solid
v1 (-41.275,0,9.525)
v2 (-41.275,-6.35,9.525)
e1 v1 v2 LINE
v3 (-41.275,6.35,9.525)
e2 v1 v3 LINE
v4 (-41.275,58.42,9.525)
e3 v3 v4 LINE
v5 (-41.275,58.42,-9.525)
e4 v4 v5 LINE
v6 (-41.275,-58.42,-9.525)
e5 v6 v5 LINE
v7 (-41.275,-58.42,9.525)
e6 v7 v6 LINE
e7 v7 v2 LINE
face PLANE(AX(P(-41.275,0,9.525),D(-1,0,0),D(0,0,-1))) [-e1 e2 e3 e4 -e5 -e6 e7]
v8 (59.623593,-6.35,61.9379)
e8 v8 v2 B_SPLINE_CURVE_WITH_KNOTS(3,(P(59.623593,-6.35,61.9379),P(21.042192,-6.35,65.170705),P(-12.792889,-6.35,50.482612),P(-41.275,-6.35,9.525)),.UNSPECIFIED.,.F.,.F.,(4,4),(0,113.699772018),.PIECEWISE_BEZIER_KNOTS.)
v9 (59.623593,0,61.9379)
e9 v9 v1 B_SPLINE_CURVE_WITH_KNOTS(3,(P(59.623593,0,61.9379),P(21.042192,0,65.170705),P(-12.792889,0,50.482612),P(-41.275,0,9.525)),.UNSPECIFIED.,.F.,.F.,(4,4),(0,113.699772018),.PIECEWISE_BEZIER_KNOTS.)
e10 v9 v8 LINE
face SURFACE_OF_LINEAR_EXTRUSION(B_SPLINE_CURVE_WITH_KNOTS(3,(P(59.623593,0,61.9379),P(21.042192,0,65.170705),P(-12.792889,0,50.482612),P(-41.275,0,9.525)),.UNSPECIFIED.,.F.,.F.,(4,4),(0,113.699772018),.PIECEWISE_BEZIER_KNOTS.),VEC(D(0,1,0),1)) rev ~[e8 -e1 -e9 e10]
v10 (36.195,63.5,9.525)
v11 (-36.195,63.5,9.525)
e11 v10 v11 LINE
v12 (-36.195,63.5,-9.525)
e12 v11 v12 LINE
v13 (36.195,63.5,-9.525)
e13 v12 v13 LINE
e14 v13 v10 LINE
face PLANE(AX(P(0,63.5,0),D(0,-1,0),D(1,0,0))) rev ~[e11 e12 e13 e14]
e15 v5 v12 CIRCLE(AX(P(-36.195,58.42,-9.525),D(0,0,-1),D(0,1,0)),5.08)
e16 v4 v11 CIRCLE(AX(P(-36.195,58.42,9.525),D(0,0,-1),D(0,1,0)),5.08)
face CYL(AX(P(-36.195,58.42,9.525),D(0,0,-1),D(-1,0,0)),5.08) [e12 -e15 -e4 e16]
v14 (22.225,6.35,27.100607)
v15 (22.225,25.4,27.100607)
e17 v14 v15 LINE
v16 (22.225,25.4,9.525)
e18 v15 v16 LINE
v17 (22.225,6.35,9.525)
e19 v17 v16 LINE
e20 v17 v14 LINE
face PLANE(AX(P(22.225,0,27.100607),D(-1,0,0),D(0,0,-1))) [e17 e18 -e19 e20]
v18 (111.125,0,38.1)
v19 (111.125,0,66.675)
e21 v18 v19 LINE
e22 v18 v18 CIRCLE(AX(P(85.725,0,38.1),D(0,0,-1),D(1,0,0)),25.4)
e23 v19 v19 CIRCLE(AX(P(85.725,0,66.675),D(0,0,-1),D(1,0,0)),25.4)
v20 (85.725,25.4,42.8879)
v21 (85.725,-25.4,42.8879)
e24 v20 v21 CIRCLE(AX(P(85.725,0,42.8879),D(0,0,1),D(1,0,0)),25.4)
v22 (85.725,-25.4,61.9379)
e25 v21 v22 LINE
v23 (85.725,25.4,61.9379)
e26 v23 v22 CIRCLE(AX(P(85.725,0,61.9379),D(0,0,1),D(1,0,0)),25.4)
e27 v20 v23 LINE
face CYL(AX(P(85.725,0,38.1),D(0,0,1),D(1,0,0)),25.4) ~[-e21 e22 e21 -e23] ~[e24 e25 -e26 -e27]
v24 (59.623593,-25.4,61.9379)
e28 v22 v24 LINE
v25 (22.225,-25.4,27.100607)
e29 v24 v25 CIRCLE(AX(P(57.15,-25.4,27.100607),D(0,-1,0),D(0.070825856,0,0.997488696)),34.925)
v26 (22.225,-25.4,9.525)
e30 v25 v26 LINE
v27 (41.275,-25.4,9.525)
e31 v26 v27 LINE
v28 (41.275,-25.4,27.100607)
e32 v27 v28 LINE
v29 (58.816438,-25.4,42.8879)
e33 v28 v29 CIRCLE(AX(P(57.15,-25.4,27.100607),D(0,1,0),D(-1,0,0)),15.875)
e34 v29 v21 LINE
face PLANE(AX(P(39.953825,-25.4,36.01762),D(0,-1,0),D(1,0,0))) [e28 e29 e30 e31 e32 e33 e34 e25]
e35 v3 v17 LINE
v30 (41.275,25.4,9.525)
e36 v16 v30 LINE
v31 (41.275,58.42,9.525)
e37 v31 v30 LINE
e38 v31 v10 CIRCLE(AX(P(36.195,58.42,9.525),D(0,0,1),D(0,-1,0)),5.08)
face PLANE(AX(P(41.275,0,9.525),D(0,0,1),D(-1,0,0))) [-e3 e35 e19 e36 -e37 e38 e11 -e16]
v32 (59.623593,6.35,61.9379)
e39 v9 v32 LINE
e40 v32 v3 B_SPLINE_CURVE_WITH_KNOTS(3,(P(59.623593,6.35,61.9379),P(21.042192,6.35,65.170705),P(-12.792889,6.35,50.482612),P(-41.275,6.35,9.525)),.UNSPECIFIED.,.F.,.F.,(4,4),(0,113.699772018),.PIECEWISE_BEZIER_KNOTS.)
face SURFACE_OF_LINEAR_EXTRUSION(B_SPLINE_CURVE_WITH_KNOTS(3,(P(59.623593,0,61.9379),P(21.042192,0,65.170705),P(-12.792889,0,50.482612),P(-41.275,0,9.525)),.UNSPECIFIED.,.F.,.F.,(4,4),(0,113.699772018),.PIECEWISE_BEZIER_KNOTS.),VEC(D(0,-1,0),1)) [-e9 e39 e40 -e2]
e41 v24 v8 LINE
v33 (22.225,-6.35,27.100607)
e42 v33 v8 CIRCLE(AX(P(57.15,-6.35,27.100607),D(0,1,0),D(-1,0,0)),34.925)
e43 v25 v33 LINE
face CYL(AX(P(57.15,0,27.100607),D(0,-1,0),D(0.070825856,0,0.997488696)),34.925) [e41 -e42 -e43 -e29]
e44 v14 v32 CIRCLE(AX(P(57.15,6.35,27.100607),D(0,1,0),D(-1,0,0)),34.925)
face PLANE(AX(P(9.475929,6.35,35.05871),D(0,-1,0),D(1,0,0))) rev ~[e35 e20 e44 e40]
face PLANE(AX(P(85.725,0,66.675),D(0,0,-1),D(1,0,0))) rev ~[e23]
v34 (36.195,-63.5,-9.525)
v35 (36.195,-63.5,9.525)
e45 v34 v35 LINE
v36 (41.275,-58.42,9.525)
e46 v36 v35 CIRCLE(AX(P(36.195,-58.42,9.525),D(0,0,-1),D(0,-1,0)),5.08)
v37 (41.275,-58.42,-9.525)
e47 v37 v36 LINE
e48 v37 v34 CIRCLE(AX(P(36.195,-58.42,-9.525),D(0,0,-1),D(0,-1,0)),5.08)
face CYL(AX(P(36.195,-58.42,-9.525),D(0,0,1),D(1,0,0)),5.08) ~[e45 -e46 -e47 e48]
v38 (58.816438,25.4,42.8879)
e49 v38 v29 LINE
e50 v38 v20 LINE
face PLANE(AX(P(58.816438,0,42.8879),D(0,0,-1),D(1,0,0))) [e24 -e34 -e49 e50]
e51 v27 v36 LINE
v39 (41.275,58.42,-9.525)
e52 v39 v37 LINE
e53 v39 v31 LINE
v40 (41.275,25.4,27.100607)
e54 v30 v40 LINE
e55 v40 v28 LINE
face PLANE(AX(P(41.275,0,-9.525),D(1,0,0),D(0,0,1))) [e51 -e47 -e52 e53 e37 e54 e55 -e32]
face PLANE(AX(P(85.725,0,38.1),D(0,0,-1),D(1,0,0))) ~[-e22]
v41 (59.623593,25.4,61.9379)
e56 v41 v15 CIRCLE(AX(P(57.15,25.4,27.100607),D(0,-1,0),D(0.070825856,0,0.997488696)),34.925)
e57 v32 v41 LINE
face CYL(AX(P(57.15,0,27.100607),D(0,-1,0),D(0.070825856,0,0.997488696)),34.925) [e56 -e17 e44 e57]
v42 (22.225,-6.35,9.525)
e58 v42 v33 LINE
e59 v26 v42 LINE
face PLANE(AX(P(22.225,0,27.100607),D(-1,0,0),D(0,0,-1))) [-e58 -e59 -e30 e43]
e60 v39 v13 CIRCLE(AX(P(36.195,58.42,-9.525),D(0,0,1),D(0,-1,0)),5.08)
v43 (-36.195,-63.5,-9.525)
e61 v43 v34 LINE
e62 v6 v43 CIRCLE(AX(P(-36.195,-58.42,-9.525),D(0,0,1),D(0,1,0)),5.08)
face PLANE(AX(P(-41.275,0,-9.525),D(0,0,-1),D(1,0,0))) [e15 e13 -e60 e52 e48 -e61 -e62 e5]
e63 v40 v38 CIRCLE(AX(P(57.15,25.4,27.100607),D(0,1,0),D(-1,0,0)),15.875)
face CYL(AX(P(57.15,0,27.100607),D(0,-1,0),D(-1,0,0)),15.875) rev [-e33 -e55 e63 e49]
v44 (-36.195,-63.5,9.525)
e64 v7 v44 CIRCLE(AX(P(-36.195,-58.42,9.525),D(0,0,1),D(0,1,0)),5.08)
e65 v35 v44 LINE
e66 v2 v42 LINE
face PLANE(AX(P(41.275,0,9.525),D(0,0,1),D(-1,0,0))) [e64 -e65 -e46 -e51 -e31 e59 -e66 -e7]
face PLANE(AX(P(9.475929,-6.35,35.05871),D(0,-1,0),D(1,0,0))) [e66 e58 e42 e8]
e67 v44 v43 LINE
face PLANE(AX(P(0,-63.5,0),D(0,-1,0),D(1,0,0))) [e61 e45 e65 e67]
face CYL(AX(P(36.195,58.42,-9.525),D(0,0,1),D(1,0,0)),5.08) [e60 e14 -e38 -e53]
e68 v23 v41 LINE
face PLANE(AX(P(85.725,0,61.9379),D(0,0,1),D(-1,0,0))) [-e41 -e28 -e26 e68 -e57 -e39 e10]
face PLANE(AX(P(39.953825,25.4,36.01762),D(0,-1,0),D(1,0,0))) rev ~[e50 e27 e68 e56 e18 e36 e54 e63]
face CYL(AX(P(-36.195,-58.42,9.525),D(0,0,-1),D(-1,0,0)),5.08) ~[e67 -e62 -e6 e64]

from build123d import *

# Parameters (mm, degrees)
F1_DEPTH = 63.5
F0_W     = 25.4
F0_H     = 19.05
F2_DEPTH = 25.4
F3_DEPTH = 6.35
F5_R     = 5.08


# Not quite as in the source:
# - a length typed as a fraction of an inch, garbled in the dataset ("3 / 203.2 mm" for 3/8 in), is restored


with BuildPart() as f1:
    # F0 (on Front) → F1 (new body, symmetric)
    with BuildSketch(Plane.XZ):
        Polygon((-41.275, -9.525), (41.275, -9.525), (41.275, 9.525), (22.225, 9.525), (-41.275, 9.525), align=None)
    extrude(amount=F1_DEPTH, both=True)

    # F0 (on Front) → F2 (join, symmetric)
    with BuildSketch(Plane.XZ):
        with BuildLine():
            Line((22.225, 9.525), (41.275, 9.525))
            Line((41.275, 9.525), (41.275, 27.1006073004))
            ThreePointArc((41.275, 27.1006073004), (46.5301853034, 38.9004022482), (58.8164375824, 42.8879))
            Line((58.8164375824, 42.8879), (60.325, 42.8879))
            Line((60.325, 42.8879), (60.325, 61.9379))
            Line((60.325, 61.9379), (59.6235930061, 61.9379))
            ThreePointArc((59.6235930061, 61.9379), (33.3449019193, 52.6558989318), (22.225, 27.1006073004))
            Line((22.225, 27.1006073004), (22.225, 9.525))
        make_face()
        with Locations((73.025, 52.4129)):
            Rectangle(F0_W, F0_H)
    extrude(amount=F2_DEPTH, both=True)

    # F0 (on Front) → F3 (join, symmetric)
    with BuildSketch(Plane.XZ):
        with BuildLine():
            add(Edge.make_bspline(
                [(59.6235930061, 61.9379), (21.0421923548, 65.1707053185), (-12.7928890288, 50.4826121032), (-41.275, 9.525)],
                knots=[0, 0, 0, 0, 113.6997720183, 113.6997720183, 113.6997720183, 113.6997720183], degree=3))
            Line((-41.275, 9.525), (22.225, 9.525))
            Line((22.225, 9.525), (22.225, 27.1006073004))
            ThreePointArc((22.225, 27.1006073004), (33.3449019193, 52.6558989318), (59.6235930061, 61.9379))
        make_face()
    extrude(amount=F3_DEPTH, both=True)

    # F0 (on Front) → F4 (revolve)
    with BuildSketch(Plane.XZ):
        Polygon((85.725, 66.675), (85.725, 61.9379), (85.725, 42.8879), (85.725, 38.1), (111.125, 38.1), (111.125, 66.675), align=None)
    revolve(axis=Axis((85.725, 0, 52.3875), (0, 0, -1)))

    # F5
    f5_edges = [f1.edges().sort_by_distance(p)[0] for p in [
        (41.275, -63.5, 0),
        (-41.275, -63.5, 0),
        (41.275, 63.5, 0),
        (-41.275, 63.5, 0),
    ]]
    fillet(f5_edges, radius=F5_R)


solid = f1.part
